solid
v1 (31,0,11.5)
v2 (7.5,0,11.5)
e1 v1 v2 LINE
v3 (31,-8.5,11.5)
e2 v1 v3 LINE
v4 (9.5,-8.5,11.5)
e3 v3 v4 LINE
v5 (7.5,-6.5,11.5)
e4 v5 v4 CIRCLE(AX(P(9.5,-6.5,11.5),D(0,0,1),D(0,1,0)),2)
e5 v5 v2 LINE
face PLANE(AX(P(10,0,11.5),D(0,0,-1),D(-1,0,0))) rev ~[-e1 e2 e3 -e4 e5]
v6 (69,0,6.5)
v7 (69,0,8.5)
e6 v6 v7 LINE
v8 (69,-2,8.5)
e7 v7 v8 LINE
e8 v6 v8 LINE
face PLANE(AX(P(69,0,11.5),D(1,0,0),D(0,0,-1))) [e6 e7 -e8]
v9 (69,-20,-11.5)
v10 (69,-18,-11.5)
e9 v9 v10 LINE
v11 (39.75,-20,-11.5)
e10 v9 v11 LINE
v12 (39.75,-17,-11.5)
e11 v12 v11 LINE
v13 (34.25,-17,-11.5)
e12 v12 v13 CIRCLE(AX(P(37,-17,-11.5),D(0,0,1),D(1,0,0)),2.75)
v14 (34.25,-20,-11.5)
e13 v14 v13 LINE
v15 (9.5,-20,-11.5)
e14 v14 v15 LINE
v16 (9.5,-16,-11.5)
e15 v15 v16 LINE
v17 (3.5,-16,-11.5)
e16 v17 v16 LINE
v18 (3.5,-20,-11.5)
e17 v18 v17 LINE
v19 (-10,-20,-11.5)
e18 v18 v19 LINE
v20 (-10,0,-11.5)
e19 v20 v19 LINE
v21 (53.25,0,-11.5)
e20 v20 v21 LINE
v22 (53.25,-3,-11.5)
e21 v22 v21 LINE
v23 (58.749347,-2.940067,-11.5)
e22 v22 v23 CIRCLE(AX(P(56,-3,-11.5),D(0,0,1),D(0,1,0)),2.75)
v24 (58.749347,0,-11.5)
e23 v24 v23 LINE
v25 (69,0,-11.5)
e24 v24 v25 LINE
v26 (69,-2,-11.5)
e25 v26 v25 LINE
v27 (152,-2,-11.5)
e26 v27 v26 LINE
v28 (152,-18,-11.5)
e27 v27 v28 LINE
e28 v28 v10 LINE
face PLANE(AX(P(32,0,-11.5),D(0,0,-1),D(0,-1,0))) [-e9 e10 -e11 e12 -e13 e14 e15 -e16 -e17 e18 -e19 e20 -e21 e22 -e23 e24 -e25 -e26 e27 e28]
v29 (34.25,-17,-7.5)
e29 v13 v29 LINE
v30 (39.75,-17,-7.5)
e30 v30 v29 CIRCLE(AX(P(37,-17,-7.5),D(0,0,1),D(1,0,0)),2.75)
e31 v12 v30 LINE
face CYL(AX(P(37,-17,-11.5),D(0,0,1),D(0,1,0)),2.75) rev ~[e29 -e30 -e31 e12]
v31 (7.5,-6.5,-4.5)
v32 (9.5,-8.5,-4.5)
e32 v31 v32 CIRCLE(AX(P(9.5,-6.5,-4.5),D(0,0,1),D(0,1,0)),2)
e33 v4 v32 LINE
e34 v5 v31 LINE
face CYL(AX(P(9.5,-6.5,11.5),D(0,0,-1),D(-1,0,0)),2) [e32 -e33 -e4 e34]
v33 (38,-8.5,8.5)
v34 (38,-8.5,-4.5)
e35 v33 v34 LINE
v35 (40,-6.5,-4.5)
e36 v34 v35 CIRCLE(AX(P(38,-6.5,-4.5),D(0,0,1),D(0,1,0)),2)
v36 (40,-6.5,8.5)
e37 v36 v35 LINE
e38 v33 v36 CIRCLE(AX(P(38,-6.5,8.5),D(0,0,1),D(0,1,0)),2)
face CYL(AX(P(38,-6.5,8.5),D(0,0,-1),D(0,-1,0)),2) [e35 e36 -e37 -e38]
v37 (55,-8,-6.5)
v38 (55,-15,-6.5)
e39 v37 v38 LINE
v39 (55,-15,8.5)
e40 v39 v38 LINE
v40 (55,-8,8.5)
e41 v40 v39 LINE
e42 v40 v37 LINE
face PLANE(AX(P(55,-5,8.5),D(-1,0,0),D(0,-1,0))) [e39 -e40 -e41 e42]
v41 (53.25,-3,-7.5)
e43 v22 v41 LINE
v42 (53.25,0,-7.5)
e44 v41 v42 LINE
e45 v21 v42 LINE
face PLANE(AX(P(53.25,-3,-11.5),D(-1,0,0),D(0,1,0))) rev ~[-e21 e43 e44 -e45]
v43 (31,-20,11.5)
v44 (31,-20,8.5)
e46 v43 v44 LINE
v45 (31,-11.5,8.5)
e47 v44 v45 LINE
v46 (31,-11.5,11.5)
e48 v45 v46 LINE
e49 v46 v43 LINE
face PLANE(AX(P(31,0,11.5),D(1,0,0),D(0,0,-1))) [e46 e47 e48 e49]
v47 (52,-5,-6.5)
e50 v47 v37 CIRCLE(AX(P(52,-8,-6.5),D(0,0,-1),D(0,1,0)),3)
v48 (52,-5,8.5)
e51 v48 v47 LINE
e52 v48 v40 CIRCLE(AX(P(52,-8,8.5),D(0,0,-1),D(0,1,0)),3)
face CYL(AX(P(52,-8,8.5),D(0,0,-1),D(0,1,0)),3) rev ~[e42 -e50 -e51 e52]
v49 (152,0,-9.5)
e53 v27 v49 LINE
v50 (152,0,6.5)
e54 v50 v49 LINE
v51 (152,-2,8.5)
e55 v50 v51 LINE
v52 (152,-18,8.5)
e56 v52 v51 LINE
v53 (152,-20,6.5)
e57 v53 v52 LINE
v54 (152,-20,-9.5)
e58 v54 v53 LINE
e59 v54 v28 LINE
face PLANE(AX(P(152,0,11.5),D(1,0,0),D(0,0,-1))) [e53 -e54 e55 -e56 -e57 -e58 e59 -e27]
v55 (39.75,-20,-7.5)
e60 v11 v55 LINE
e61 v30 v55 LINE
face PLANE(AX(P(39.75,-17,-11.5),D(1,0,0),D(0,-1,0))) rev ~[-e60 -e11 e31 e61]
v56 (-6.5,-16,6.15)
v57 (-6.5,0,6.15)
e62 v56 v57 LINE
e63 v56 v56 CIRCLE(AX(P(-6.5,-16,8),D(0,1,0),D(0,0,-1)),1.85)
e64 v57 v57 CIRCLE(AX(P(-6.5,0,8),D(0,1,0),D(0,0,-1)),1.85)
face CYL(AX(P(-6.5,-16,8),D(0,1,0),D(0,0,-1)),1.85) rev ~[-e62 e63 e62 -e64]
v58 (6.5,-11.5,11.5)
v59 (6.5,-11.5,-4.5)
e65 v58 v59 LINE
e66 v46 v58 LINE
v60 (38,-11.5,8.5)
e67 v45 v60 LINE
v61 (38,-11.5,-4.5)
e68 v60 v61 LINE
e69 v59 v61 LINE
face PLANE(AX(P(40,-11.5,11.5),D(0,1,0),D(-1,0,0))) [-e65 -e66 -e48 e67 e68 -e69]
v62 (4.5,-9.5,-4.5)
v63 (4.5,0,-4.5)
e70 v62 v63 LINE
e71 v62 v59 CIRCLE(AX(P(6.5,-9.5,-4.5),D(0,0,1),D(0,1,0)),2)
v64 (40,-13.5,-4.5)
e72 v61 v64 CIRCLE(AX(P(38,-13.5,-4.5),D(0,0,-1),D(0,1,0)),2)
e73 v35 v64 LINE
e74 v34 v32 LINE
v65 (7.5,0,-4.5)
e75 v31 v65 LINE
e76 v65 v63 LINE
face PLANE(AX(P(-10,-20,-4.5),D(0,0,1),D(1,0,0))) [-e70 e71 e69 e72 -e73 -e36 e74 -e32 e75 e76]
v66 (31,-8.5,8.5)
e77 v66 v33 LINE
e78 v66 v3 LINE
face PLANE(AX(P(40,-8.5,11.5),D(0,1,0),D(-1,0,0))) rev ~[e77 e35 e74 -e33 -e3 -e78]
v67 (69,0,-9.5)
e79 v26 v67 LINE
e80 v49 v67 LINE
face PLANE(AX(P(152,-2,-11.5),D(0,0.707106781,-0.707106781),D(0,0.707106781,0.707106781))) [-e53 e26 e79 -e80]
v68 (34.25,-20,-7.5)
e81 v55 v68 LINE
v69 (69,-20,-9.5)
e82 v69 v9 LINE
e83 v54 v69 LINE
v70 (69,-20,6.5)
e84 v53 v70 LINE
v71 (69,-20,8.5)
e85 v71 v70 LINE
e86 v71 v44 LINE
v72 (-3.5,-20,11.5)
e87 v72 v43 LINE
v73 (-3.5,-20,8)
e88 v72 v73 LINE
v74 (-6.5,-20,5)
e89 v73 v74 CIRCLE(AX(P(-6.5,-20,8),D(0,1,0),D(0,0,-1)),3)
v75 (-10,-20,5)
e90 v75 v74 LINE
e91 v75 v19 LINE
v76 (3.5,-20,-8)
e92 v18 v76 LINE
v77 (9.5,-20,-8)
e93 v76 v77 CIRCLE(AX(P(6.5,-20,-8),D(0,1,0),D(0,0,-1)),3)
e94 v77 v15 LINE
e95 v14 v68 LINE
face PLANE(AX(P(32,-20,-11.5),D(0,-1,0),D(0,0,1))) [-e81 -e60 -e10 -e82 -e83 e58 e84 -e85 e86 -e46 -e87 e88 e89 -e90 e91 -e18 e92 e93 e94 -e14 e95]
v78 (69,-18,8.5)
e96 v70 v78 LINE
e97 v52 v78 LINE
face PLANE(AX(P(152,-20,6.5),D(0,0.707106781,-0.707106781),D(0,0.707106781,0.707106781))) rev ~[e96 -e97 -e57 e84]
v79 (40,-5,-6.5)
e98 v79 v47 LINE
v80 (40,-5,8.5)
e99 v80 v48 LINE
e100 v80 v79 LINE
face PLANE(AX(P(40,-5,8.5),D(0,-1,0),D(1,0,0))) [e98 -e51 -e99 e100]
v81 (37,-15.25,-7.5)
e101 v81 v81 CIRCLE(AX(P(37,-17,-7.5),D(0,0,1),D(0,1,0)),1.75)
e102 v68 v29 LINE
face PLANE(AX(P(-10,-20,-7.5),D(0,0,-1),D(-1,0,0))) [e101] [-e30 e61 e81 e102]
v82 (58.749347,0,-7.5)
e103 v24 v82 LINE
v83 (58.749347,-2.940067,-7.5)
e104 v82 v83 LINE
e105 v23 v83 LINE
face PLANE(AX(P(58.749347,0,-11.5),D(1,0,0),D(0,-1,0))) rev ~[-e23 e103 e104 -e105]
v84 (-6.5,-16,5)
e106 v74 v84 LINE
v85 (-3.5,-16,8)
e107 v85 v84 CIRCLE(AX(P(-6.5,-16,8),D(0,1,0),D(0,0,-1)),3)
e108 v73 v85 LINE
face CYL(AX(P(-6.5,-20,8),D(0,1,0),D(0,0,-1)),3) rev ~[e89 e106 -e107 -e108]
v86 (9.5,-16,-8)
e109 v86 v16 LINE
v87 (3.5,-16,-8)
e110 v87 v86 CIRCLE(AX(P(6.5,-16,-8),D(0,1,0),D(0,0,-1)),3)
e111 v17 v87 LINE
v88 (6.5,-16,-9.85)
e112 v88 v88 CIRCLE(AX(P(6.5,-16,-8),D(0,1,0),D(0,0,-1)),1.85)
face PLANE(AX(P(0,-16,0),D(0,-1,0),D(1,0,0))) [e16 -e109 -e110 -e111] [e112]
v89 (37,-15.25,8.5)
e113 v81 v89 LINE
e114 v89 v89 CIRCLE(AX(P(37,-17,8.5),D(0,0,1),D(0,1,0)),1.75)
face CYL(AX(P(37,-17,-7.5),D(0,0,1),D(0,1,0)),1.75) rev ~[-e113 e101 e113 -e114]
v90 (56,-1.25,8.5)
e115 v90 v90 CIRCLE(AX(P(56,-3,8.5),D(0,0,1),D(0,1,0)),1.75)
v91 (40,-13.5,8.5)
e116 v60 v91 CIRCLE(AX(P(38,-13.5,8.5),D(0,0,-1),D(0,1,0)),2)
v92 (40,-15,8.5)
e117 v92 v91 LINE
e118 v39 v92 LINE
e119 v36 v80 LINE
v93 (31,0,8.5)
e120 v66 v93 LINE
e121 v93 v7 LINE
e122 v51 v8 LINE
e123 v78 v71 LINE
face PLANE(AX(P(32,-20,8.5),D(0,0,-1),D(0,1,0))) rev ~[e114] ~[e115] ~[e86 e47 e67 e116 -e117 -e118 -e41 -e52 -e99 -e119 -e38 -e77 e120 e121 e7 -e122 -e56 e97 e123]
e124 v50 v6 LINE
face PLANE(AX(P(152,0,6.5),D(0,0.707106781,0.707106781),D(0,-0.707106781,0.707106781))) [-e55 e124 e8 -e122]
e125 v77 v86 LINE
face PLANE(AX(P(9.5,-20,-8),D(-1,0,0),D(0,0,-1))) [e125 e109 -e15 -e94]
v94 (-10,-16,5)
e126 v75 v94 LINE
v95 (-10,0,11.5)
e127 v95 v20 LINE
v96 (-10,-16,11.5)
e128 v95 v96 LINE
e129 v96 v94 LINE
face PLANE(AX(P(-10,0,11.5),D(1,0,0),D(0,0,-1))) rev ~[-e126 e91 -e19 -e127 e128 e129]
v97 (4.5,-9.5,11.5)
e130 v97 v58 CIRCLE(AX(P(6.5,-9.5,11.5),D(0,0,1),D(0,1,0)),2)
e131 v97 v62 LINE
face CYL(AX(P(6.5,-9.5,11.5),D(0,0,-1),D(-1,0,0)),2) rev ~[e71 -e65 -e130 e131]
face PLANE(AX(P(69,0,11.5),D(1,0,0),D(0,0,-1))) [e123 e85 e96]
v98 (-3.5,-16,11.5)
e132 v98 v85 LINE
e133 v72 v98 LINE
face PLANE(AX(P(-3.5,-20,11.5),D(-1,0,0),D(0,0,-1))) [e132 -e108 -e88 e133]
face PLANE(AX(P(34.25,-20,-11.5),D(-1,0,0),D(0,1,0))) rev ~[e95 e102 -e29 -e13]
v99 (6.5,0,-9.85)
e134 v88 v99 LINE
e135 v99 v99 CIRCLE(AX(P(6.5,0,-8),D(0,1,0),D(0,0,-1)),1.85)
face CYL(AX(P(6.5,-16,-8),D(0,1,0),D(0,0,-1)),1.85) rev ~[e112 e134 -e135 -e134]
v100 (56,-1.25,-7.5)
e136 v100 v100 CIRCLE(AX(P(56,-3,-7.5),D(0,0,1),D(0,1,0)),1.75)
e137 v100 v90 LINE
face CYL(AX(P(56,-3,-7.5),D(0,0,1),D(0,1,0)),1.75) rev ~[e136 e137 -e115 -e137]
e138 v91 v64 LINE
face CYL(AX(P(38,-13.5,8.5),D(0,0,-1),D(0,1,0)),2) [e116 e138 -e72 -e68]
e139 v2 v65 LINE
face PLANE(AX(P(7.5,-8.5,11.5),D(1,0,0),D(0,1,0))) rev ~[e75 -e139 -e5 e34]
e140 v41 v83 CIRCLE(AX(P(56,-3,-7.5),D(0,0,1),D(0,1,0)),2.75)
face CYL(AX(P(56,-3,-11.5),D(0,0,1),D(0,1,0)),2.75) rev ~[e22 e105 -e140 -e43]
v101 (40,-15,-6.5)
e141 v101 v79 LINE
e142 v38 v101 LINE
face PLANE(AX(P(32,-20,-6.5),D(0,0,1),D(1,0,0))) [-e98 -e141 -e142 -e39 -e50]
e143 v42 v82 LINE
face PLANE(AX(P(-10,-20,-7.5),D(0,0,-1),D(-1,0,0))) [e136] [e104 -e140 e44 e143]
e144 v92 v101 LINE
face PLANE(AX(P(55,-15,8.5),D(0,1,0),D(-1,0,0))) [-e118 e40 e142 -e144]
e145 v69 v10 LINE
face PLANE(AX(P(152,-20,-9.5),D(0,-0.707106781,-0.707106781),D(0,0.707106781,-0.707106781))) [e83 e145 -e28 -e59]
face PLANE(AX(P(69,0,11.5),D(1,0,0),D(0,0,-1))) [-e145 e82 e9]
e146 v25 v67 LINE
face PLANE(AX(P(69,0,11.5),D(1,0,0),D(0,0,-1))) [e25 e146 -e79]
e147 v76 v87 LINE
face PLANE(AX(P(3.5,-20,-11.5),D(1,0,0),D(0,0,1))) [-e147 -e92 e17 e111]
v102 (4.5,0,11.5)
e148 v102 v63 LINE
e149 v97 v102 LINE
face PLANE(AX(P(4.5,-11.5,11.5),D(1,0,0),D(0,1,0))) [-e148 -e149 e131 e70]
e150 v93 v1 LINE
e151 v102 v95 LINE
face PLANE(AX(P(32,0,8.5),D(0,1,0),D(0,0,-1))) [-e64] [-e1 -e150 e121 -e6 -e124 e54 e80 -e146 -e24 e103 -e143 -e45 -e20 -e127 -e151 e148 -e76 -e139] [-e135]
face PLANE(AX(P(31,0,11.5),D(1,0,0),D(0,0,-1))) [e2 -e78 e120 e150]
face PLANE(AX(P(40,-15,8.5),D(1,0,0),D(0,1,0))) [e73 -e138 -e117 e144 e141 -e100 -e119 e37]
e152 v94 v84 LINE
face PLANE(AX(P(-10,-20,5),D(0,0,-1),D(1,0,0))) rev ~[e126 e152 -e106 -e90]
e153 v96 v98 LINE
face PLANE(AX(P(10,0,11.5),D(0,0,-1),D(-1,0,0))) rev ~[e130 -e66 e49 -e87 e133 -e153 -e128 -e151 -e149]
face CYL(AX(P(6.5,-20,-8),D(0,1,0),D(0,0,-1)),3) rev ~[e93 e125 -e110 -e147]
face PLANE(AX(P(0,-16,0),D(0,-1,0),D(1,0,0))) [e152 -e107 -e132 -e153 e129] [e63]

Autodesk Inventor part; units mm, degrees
ref_plane "YZ Plane" through (0, 0, 0) normal (1, 0, 0) x (0, 1, 0)
ref_plane "XZ Plane" through (0, 0, 0) normal (0, 1, 0) x (-1, 0, 0)
ref_plane "XY Plane" through (0, 0, 0) normal (0, 0, 1) x (1, 0, 0)
sketch "Sketch1" plane through (0, 0, 0) normal (0, 1, 0) x (-1, 0, 0)
  line L0 (-10, 11.5) -> (10, 11.5)
  line L1 (10, 11.5) -> (10, -11.5)
  line L2 (10, -11.5) -> (-10, -11.5)
  line L3 (-10, -11.5) -> (-10, 11.5)
  line L4 (-10, 11.5) -> (10, -11.5) construction
  line L5 (10, 11.5) -> (-10, -11.5) construction
  point P0 (0, 0)
  dimension "d0" = 20
  dimension "d1" = 23
extrude "Extrusion2" add sketch "Sketch1" against normal blind 20
ref_plane "Work Plane1" through (-10, 0, 0) normal (0, 0, 1) x (1, 0, 0)
ref_plane "Work Plane2" through (0, -2, 0) normal (0, 1, 0) x (1, 0, 0)
sketch "Sketch11" plane through (0, -2, 0) normal (0, 1, 0) x (1, 0, 0)
  point P0 (0, 0)
sketch "Sketch12" plane through (10, 0, 11.5) normal (1, 0, 0) x (0, 0, -1)
  line L0 (23, -20) -> (0, -20)
  line L1 (0, -20) -> (0, 0)
  line L2 (0, 0) -> (23, 0)
  line L3 (23, 0) -> (23, -20)
  point P0 (11.5, 0)
  dimension "d41" = 23
  dimension "d42" = 20
extrude "Extrusion4" add sketch "Sketch12" along normal blind 22
sketch "Sketch13" plane through (32, 0, 11.5) normal (1, 0, 0) x (0, 0, -1)
  line L0 (23, 0) -> (23, -20) projected
  line L1 (23, -20) -> (3, -20)
  line L2 (3, -20) -> (3, 0)
  line L3 (3, 0) -> (23, 0)
  line L4 (23, 0) -> (23, -20)
  point P0 (11.5, 0)
  dimension "d45" = 20
extrude "Extrusion5" add sketch "Sketch13" along normal blind 120
sketch "Sketch26" plane through (32, -20, 8.5) normal (0, 0, 1) x (1, 0, 0)
  line L0 (8, 15) -> (23, 15)
  line L1 (23, 15) -> (23, 5)
  line L2 (23, 5) -> (8, 5)
  line L3 (8, 5) -> (8, 15)
  line L4 (0, 20) -> (120, 20) projected
  line L5 (0, 0) -> (120, 0) projected
  point P0 (-32, 20)
  dimension "d91" = 15
  dimension "d92" = 10
  dimension "d93" = 5
  dimension "d94" = 5
extrude "Extrusion12" cut sketch "Sketch26" against normal blind 15
sketch "Sketch28" plane through (10, 0, -11.5) normal (0, 0, -1) x (-1, 0, 0)
  line L0 (-22, 0) -> (-22, -20) projected
  line L1 (20, -20) -> (-142, -20) projected
  line L2 (-22, 0) -> (-142, 0) projected
  point P0 (10, 0)
  point P1 (-27, -17)
  point P2 (-46, -3)
  dimension "d101" = 19
  dimension "d102" = 5
  dimension "d103" = 3
  dimension "d104" = 3
hole "Hole3" at (56, -3, -11.5) at (37, -17, -11.5) direction (0, 0, 1) diameter 3.5 end through all counterbore diameter 5.5 counterbore depth 4
sketch "Sketch29" plane through (0, -20, 0) normal (0, -1, 0) x (1, 0, 0)
  line L0 (10, 11.5) -> (-10, 11.5) projected
  line L1 (10, -11.5) -> (10, 11.5) projected
  line L2 (-10, -11.5) -> (152, -11.5) projected
  line L3 (-10, 11.5) -> (-10, -11.5) projected
  point P0 (0, 0)
  point P1 (6.5, -8)
  point P2 (-6.5, 8)
  dimension "d112" = 3.5
  dimension "d113" = 3.5
  dimension "d128" = 3.5
  dimension "d129" = 3.5
hole "Hole4" at (-6.5, -20, 8) at (6.5, -20, -8) direction (0, 1, 0) diameter 3.7 end through all counterbore diameter 6 counterbore depth 4
sketch "Sketch38" plane through (0, -20, 0) normal (0, -1, 0) x (1, 0, 0)
  circle A0 centre (-6.5, 8) radius 3 projected
  circle A1 centre (6.5, -8) radius 3 projected
  circle A2 centre (-6.5, 8) radius 3 projected
  circle A3 centre (6.5, -8) radius 3 projected
  line L0 (-10, 11.5) -> (32, 11.5) projected
  line L1 (-10, 11.5) -> (-10, -11.5) projected
  line L2 (-10, -11.5) -> (152, -11.5) projected
  line L3 (152, 8.5) -> (152, -11.5) projected
  line L4 (32, 8.5) -> (152, 8.5) projected
  line L5 (32, 11.5) -> (32, 8.5) projected
  circle A4 centre (-6.5, 8) radius 3 projected
  line L6 (-10, 11.5) -> (-10, -11.5) projected
  line L7 (-10, -11.5) -> (152, -11.5) projected
  line L8 (3.5, -11.5) -> (3.5, -8)
  circle A5 centre (6.5, -8) radius 3 projected
  line L9 (9.5, -8) -> (9.5, -11.5)
  line L10 (-3.5, 11.5) -> (-3.5, 8)
  line L11 (-10, 11.5) -> (-10, -11.5) projected
  line L12 (-10, 5) -> (-6.5, 5)
  point P0 (0, 0)
extrude "Extrusion17" cut sketch "Sketch38" against normal up to surface (4 mm away) contours A0 L12 L1 L0 L10 | L8 A1 L9 L2
sketch "Sketch33" plane through (-10, -20, -11.5) normal (0, 0, -1) x (-1, 0, 0)
  circle A0 centre (-66, 17) radius 2.75
  circle A1 centre (-47, 3) radius 2.75
  line L0 (0, 20) -> (-162, 20)
  line L1 (0, 0) -> (-162, 0)
  circle A2 centre (-66, 17) radius 2.75
  line L2 (-63.25, 17) -> (-63.25, 20)
  line L3 (-68.749347, 16.940067) -> (-68.749347, 20)
  line L4 (-49.75, 3) -> (-49.75, 0)
  line L5 (-44.25, 3) -> (-44.25, 0)
  point P0 (-10, 20)
sketch "Sketch33 outline for Extrusion13" plane through (-10, -20, -11.5) normal (0, 0, -1) x (-1, 0, 0)
  arc A0 (-44.25, 3) -> (-49.75, 3) centre (-47, 3) cw
  line L0 (-44.25, 0) -> (-44.25, 3)
  line L1 (-49.75, 0) -> (-44.25, 0)
  line L2 (-49.75, 3) -> (-49.75, 0)
  arc A1 (-63.25, 17) -> (-68.749347, 17.059933) centre (-66, 17) ccw
  line L3 (-68.749347, 20) -> (-68.749347, 17.059933)
  line L4 (-63.25, 20) -> (-68.749347, 20)
  line L5 (-63.25, 17) -> (-63.25, 20)
extrude "Extrusion13" cut sketch "Sketch33 outline for Extrusion13" against normal up to surface (4 mm away)
sketch "Sketch34" plane through (32, 0, 11.5) normal (1, 0, 0) x (0, 0, -1)
  line L0 (3, -20) -> (3, 0) projected
  line L1 (3, 0) -> (0, 0) projected
  line L2 (0, 0) -> (0, -20) projected
  line L3 (0, -20) -> (3, -20) projected
  point P0 (11.5, 0)
extrude "ajustement" cut sketch "Sketch34" against normal blind 1
sketch "Sketch37" plane through (-10, -20, 11.5) normal (0, 0, 1) x (1, 0, 0)
  line L0 (20, 20) -> (20, 0) construction
  line L1 (0, 0) -> (41, 0) construction
  line L2 (20, 20) -> (40, 20) construction
  line L3 (50, 5) -> (50, 15) construction
  line L4 (50, 10) -> (20, 10) construction
  line L5 (50, 8.5) -> (17.5, 8.5)
  line L6 (17.5, 8.5) -> (14.5, 8.5)
  line L7 (14.5, 8.5) -> (14.5, 20)
  line L8 (41, 20) -> (0, 20) projected
  line L9 (50, 11.5) -> (17.5, 11.5)
  line L10 (17.5, 11.5) -> (17.5, 20)
  line L11 (17.5, 20) -> (14.5, 20)
  line L12 (50, 8.5) -> (50, 11.5)
  point P0 (10, 20)
  point P1 (20, 20)
  point P2 (0, 20)
  point P3 (17.5, 12)
  dimension "d137" = 90
  dimension "d138" = 2.5
  dimension "d139" = 1.5
  dimension "d140" = 1.5
  dimension "d141" = 3
ref_plane "Work Plane4" through (-10, -20, -4.5) normal (0, 0, 1) x (1, 0, 0)
extrude "Extrusion16" cut sketch "Sketch37" against normal up to surface (16 mm away)
fillet "Fillet1" radius 2 4 edges at (4.5, -11.5, 3.5) (7.5, -8.5, 3.5) (40, -11.5, 2) (40, -8.5, 2)
fillet "Fillet2" radius 3 1 edges at (55, -5, 1)
sketch "Sketch39" plane through (152, -20, 8.5) normal (0, 0, 1) x (1, 0, 0)
  arc A0 (-97, 12) -> (-100, 15) centre (-100, 12) ccw projected
  line L0 (-112, 15) -> (-100, 15) projected
  line L1 (-112, 5) -> (-112, 15) projected
  line L2 (-97, 5) -> (-112, 5) projected
  line L3 (-97, 12) -> (-97, 5) projected
  line L4 (-121, 11.5) -> (-121, 20) projected
  circle A1 centre (-115, 3) radius 1.75 projected
  line L5 (-121, 0) -> (-121, 8.5) projected
  point P0 (-152, 20)
  point P1 (-104.5, 10)
  dimension "d149" = 16.5
  dimension "d150" = 6
ref_plane "Work Plane5" through (69, 0, 11.5) normal (1, 0, 0) x (0, 0, -1)
sketch "Sketch41" plane through (152, 0, 11.5) normal (1, 0, 0) x (0, 0, -1)
  line L0 (3, -20) -> (23, -20) projected
  line L1 (23, -20) -> (23, 0) projected
  line L2 (23, 0) -> (3, 0) projected
  line L3 (3, 0) -> (3, -20) projected
  line L4 (3, -20) -> (23, -20) projected
  line L5 (5, -20) -> (3, -18)
  line L6 (21, -20) -> (23, -18)
  line L7 (23, -2) -> (21, 0)
  line L8 (23, 0) -> (3, 0) projected
  line L9 (5, 0) -> (3, -2)
  point P0 (11.5, 0)
  dimension "d152" = 2
  dimension "d153" = 2
  dimension "d154" = 2
  dimension "d155" = 2
  dimension "d156" = 2
  dimension "d157" = 2
  dimension "d158" = 2
  dimension "d159" = 2
extrude "Extrusion18" cut sketch "Sketch41" against normal up to surface (83 mm away) contours L3 L5 L0 | L6 L1 L0 | L3 L2 L9 | L7 L2 L1
equation "\"d93\" = d94"
equation "\"d104\" = d103"
equation "\"d113\" = d112"
equation "\"d129\" = d128"
equation "\"d140\" = d139"
equation "\"d153\" = d152"
equation "\"d154\" = d152"
equation "\"d155\" = d152"
equation "\"d156\" = d152"
equation "\"d158\" = d152"
properties part number "bas_de_fourche_gros_bloc"
